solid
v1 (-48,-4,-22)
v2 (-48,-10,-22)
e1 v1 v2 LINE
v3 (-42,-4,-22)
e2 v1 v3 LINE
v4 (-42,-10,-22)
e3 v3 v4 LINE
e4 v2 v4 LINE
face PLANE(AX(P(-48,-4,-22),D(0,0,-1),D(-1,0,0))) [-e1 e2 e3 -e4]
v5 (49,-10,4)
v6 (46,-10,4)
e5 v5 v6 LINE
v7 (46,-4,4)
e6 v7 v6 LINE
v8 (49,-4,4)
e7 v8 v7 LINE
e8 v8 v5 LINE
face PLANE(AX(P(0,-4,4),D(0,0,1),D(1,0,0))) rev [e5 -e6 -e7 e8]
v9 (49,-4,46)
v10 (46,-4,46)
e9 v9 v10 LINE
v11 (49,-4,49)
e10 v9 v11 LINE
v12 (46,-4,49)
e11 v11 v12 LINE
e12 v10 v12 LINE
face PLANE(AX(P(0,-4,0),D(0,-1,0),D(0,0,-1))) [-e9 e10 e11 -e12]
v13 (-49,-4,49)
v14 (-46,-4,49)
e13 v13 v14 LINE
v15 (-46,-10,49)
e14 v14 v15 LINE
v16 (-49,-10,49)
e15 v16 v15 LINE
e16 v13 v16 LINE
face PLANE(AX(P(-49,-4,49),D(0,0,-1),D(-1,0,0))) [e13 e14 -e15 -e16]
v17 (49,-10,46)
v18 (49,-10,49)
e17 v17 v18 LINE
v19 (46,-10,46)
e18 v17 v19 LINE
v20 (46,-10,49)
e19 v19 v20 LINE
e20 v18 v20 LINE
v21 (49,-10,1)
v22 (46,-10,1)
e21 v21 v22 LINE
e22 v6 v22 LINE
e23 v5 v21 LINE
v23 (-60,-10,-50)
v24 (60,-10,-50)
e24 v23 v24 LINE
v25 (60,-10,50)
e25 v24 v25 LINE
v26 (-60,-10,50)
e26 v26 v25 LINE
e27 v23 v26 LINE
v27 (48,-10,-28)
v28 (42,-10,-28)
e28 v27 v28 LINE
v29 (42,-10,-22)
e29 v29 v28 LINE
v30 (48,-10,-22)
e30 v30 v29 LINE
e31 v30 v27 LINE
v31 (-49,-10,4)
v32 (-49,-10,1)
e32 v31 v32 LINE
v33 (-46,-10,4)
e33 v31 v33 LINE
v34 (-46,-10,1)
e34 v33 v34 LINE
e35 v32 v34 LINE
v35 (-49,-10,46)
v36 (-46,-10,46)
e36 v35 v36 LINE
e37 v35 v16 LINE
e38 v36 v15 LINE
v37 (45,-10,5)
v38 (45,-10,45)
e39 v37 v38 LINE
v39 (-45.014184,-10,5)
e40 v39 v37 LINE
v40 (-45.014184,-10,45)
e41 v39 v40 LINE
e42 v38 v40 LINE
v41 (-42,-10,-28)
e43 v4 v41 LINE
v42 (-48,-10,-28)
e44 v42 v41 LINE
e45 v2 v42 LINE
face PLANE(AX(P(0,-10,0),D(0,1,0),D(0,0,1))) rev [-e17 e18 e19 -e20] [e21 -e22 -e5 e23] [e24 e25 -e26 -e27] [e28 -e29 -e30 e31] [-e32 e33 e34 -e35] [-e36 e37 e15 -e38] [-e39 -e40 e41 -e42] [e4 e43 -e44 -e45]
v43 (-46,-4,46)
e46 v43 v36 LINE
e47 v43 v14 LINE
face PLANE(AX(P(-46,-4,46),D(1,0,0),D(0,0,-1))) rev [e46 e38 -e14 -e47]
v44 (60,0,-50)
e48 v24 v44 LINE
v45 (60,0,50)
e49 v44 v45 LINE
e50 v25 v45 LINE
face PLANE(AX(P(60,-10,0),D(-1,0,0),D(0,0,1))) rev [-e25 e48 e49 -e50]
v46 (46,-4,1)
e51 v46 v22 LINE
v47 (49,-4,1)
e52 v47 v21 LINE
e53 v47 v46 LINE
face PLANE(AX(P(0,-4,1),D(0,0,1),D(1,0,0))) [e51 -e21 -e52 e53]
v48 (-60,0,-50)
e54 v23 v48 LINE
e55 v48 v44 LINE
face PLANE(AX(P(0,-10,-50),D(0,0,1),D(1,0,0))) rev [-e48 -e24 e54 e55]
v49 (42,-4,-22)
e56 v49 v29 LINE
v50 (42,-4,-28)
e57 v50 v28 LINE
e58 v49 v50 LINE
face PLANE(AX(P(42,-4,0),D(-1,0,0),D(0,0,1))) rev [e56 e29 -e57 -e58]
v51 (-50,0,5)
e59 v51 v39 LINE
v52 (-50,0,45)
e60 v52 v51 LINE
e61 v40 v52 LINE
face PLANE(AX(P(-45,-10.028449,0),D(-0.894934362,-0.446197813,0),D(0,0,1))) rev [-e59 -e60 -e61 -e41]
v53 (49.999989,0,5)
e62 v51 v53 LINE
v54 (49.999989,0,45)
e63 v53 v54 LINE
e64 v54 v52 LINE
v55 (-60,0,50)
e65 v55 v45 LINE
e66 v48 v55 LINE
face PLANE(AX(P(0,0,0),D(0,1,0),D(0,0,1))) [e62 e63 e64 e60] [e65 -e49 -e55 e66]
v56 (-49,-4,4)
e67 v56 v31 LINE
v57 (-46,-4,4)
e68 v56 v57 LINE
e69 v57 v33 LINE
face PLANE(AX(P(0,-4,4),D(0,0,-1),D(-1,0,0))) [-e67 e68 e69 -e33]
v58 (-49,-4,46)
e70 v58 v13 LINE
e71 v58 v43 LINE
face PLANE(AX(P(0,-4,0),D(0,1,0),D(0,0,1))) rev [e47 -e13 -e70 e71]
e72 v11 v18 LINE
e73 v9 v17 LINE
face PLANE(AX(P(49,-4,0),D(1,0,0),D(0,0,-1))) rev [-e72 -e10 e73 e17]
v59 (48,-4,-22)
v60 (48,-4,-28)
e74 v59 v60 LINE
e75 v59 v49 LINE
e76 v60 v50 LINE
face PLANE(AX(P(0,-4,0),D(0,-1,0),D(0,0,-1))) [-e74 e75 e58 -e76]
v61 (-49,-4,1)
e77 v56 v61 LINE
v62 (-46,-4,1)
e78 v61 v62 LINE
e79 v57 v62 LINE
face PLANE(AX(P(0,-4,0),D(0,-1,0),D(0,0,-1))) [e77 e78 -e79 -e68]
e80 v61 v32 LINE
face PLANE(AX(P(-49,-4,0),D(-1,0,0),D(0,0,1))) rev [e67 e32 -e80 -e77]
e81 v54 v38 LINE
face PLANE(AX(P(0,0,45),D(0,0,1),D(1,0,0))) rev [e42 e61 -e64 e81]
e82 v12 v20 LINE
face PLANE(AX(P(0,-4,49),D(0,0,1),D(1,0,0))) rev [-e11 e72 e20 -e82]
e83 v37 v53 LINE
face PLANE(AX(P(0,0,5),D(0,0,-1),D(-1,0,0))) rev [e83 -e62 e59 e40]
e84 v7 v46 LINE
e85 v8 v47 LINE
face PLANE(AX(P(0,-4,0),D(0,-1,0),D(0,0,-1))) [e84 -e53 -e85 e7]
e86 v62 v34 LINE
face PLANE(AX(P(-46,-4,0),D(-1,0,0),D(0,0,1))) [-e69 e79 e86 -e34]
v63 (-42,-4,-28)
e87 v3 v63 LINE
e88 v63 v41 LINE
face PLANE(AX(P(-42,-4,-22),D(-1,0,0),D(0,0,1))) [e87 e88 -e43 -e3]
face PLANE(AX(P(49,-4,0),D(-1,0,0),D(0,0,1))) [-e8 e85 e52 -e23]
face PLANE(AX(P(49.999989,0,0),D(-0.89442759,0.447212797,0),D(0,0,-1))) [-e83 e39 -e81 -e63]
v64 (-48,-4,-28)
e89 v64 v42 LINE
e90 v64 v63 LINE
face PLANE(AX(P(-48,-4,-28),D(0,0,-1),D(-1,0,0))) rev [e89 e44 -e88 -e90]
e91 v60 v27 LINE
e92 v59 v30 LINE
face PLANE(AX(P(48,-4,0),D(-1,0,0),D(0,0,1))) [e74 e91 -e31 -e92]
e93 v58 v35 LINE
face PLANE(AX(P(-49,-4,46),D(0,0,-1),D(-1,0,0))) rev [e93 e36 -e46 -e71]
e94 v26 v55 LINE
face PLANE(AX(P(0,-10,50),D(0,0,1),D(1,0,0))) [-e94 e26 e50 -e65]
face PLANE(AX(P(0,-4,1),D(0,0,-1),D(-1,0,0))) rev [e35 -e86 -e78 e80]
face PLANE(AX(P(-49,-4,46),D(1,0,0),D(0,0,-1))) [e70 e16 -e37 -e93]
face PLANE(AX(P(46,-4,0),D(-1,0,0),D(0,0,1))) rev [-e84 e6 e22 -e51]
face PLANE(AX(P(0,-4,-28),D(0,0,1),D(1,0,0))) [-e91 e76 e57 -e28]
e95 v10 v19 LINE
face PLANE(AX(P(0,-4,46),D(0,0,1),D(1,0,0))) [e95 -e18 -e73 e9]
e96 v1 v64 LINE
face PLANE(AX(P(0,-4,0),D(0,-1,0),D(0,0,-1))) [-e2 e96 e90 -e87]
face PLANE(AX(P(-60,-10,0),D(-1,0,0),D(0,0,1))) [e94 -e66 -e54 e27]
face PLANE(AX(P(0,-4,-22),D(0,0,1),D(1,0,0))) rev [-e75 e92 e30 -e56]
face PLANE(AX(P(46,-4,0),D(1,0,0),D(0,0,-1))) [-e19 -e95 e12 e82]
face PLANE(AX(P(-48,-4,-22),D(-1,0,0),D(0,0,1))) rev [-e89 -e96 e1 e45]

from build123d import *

# Parameters (mm, degrees)
BOSS_EXTRUDE1_DEPTH = 10
SKETCH2_W           = 90
SKETCH2_H           = 40
CUT_EXTRUDE1_DEPTH  = 10
SKETCH2_3_W         = 3
SKETCH2_3_H         = 3
SKETCH2_3_W_2       = 6
SKETCH2_3_H_2       = 6
CUT_EXTRUDE2_DEPTH  = 6
CHAMFER2_SIZE       = 5
CHAMFER2_SIZE_2     = 10.028448541
CHAMFER3_SIZE2      = 4.999988835
CHAMFER3_SIZE       = 10


# Some blends are built 0.0001 mm under size
with BuildPart() as part:
    # Sketch1 → Boss-Extrude1 (new body)
    with BuildSketch(Plane(origin=(0, 0, 0), x_dir=(1, 0, 0), z_dir=(0, 1, 0))):
        Polygon((-60, 50), (-60, -2.5), (-60, -50), (0, -50), (60, -50), (60, 50), (0, 50), align=None)
    extrude(amount=-BOSS_EXTRUDE1_DEPTH)

    # Sketch2 → Cut-Extrude1 (cut)
    with BuildSketch(Plane.XZ.offset(10)):
        with Locations((0, 25)):
            Rectangle(SKETCH2_W, SKETCH2_H)
    extrude(amount=-CUT_EXTRUDE1_DEPTH, mode=Mode.SUBTRACT)

    # Sketch2<3> → Cut-Extrude2 (cut)
    with BuildSketch(Plane.XZ.offset(10)):
        with Locations((47.5, 47.5)):
            Rectangle(SKETCH2_3_W, SKETCH2_3_H)
        with Locations((-47.5, 2.5)):
            Rectangle(SKETCH2_3_W, SKETCH2_3_H)
        with Locations((47.5, 2.5)):
            Rectangle(SKETCH2_3_W, SKETCH2_3_H)
        with Locations((45, -25)):
            Rectangle(SKETCH2_3_W_2, SKETCH2_3_H_2)
        with Locations((-47.5, 47.5)):
            Rectangle(SKETCH2_3_W, SKETCH2_3_H)
        with Locations((-45, -25)):
            Rectangle(SKETCH2_3_W_2, SKETCH2_3_H_2)
    extrude(amount=-CUT_EXTRUDE2_DEPTH, mode=Mode.SUBTRACT)

    # Chamfer2
    # the kernel refuses this chamfer: 10.028448541, 5 mm, written as the material it takes off along each edge
    with BuildSketch(Plane(origin=(-45, 0, 5), x_dir=(-0.9976061957759285, 0.06915112543899754, 0), z_dir=(0, 0, 1))) as chamfer2_piece_1:
        Polygon((CHAMFER2_SIZE * 0.997606195776, CHAMFER2_SIZE * 0.069151125439), (-CHAMFER2_SIZE_2 * 0.069151125441, CHAMFER2_SIZE_2 * 0.997606195805), (0, 0), align=None)
    extrude(amount=40, mode=Mode.SUBTRACT)

    # Chamfer3
    chamfer3_edges = [part.edges().sort_by_distance(p)[0] for p in [
        (45, 0, 25),
    ]]
    chamfer3_side = [part.faces().sort_by_distance(p)[0] for p in [
        (45, -0.099999777, 25),
    ]]
    chamfer(chamfer3_edges, length=CHAMFER3_SIZE - 0.0001, length2=CHAMFER3_SIZE2 - 0.0001, reference=chamfer3_side[0])  # a hair under: the kernel refuses the full size


solid = part.part
